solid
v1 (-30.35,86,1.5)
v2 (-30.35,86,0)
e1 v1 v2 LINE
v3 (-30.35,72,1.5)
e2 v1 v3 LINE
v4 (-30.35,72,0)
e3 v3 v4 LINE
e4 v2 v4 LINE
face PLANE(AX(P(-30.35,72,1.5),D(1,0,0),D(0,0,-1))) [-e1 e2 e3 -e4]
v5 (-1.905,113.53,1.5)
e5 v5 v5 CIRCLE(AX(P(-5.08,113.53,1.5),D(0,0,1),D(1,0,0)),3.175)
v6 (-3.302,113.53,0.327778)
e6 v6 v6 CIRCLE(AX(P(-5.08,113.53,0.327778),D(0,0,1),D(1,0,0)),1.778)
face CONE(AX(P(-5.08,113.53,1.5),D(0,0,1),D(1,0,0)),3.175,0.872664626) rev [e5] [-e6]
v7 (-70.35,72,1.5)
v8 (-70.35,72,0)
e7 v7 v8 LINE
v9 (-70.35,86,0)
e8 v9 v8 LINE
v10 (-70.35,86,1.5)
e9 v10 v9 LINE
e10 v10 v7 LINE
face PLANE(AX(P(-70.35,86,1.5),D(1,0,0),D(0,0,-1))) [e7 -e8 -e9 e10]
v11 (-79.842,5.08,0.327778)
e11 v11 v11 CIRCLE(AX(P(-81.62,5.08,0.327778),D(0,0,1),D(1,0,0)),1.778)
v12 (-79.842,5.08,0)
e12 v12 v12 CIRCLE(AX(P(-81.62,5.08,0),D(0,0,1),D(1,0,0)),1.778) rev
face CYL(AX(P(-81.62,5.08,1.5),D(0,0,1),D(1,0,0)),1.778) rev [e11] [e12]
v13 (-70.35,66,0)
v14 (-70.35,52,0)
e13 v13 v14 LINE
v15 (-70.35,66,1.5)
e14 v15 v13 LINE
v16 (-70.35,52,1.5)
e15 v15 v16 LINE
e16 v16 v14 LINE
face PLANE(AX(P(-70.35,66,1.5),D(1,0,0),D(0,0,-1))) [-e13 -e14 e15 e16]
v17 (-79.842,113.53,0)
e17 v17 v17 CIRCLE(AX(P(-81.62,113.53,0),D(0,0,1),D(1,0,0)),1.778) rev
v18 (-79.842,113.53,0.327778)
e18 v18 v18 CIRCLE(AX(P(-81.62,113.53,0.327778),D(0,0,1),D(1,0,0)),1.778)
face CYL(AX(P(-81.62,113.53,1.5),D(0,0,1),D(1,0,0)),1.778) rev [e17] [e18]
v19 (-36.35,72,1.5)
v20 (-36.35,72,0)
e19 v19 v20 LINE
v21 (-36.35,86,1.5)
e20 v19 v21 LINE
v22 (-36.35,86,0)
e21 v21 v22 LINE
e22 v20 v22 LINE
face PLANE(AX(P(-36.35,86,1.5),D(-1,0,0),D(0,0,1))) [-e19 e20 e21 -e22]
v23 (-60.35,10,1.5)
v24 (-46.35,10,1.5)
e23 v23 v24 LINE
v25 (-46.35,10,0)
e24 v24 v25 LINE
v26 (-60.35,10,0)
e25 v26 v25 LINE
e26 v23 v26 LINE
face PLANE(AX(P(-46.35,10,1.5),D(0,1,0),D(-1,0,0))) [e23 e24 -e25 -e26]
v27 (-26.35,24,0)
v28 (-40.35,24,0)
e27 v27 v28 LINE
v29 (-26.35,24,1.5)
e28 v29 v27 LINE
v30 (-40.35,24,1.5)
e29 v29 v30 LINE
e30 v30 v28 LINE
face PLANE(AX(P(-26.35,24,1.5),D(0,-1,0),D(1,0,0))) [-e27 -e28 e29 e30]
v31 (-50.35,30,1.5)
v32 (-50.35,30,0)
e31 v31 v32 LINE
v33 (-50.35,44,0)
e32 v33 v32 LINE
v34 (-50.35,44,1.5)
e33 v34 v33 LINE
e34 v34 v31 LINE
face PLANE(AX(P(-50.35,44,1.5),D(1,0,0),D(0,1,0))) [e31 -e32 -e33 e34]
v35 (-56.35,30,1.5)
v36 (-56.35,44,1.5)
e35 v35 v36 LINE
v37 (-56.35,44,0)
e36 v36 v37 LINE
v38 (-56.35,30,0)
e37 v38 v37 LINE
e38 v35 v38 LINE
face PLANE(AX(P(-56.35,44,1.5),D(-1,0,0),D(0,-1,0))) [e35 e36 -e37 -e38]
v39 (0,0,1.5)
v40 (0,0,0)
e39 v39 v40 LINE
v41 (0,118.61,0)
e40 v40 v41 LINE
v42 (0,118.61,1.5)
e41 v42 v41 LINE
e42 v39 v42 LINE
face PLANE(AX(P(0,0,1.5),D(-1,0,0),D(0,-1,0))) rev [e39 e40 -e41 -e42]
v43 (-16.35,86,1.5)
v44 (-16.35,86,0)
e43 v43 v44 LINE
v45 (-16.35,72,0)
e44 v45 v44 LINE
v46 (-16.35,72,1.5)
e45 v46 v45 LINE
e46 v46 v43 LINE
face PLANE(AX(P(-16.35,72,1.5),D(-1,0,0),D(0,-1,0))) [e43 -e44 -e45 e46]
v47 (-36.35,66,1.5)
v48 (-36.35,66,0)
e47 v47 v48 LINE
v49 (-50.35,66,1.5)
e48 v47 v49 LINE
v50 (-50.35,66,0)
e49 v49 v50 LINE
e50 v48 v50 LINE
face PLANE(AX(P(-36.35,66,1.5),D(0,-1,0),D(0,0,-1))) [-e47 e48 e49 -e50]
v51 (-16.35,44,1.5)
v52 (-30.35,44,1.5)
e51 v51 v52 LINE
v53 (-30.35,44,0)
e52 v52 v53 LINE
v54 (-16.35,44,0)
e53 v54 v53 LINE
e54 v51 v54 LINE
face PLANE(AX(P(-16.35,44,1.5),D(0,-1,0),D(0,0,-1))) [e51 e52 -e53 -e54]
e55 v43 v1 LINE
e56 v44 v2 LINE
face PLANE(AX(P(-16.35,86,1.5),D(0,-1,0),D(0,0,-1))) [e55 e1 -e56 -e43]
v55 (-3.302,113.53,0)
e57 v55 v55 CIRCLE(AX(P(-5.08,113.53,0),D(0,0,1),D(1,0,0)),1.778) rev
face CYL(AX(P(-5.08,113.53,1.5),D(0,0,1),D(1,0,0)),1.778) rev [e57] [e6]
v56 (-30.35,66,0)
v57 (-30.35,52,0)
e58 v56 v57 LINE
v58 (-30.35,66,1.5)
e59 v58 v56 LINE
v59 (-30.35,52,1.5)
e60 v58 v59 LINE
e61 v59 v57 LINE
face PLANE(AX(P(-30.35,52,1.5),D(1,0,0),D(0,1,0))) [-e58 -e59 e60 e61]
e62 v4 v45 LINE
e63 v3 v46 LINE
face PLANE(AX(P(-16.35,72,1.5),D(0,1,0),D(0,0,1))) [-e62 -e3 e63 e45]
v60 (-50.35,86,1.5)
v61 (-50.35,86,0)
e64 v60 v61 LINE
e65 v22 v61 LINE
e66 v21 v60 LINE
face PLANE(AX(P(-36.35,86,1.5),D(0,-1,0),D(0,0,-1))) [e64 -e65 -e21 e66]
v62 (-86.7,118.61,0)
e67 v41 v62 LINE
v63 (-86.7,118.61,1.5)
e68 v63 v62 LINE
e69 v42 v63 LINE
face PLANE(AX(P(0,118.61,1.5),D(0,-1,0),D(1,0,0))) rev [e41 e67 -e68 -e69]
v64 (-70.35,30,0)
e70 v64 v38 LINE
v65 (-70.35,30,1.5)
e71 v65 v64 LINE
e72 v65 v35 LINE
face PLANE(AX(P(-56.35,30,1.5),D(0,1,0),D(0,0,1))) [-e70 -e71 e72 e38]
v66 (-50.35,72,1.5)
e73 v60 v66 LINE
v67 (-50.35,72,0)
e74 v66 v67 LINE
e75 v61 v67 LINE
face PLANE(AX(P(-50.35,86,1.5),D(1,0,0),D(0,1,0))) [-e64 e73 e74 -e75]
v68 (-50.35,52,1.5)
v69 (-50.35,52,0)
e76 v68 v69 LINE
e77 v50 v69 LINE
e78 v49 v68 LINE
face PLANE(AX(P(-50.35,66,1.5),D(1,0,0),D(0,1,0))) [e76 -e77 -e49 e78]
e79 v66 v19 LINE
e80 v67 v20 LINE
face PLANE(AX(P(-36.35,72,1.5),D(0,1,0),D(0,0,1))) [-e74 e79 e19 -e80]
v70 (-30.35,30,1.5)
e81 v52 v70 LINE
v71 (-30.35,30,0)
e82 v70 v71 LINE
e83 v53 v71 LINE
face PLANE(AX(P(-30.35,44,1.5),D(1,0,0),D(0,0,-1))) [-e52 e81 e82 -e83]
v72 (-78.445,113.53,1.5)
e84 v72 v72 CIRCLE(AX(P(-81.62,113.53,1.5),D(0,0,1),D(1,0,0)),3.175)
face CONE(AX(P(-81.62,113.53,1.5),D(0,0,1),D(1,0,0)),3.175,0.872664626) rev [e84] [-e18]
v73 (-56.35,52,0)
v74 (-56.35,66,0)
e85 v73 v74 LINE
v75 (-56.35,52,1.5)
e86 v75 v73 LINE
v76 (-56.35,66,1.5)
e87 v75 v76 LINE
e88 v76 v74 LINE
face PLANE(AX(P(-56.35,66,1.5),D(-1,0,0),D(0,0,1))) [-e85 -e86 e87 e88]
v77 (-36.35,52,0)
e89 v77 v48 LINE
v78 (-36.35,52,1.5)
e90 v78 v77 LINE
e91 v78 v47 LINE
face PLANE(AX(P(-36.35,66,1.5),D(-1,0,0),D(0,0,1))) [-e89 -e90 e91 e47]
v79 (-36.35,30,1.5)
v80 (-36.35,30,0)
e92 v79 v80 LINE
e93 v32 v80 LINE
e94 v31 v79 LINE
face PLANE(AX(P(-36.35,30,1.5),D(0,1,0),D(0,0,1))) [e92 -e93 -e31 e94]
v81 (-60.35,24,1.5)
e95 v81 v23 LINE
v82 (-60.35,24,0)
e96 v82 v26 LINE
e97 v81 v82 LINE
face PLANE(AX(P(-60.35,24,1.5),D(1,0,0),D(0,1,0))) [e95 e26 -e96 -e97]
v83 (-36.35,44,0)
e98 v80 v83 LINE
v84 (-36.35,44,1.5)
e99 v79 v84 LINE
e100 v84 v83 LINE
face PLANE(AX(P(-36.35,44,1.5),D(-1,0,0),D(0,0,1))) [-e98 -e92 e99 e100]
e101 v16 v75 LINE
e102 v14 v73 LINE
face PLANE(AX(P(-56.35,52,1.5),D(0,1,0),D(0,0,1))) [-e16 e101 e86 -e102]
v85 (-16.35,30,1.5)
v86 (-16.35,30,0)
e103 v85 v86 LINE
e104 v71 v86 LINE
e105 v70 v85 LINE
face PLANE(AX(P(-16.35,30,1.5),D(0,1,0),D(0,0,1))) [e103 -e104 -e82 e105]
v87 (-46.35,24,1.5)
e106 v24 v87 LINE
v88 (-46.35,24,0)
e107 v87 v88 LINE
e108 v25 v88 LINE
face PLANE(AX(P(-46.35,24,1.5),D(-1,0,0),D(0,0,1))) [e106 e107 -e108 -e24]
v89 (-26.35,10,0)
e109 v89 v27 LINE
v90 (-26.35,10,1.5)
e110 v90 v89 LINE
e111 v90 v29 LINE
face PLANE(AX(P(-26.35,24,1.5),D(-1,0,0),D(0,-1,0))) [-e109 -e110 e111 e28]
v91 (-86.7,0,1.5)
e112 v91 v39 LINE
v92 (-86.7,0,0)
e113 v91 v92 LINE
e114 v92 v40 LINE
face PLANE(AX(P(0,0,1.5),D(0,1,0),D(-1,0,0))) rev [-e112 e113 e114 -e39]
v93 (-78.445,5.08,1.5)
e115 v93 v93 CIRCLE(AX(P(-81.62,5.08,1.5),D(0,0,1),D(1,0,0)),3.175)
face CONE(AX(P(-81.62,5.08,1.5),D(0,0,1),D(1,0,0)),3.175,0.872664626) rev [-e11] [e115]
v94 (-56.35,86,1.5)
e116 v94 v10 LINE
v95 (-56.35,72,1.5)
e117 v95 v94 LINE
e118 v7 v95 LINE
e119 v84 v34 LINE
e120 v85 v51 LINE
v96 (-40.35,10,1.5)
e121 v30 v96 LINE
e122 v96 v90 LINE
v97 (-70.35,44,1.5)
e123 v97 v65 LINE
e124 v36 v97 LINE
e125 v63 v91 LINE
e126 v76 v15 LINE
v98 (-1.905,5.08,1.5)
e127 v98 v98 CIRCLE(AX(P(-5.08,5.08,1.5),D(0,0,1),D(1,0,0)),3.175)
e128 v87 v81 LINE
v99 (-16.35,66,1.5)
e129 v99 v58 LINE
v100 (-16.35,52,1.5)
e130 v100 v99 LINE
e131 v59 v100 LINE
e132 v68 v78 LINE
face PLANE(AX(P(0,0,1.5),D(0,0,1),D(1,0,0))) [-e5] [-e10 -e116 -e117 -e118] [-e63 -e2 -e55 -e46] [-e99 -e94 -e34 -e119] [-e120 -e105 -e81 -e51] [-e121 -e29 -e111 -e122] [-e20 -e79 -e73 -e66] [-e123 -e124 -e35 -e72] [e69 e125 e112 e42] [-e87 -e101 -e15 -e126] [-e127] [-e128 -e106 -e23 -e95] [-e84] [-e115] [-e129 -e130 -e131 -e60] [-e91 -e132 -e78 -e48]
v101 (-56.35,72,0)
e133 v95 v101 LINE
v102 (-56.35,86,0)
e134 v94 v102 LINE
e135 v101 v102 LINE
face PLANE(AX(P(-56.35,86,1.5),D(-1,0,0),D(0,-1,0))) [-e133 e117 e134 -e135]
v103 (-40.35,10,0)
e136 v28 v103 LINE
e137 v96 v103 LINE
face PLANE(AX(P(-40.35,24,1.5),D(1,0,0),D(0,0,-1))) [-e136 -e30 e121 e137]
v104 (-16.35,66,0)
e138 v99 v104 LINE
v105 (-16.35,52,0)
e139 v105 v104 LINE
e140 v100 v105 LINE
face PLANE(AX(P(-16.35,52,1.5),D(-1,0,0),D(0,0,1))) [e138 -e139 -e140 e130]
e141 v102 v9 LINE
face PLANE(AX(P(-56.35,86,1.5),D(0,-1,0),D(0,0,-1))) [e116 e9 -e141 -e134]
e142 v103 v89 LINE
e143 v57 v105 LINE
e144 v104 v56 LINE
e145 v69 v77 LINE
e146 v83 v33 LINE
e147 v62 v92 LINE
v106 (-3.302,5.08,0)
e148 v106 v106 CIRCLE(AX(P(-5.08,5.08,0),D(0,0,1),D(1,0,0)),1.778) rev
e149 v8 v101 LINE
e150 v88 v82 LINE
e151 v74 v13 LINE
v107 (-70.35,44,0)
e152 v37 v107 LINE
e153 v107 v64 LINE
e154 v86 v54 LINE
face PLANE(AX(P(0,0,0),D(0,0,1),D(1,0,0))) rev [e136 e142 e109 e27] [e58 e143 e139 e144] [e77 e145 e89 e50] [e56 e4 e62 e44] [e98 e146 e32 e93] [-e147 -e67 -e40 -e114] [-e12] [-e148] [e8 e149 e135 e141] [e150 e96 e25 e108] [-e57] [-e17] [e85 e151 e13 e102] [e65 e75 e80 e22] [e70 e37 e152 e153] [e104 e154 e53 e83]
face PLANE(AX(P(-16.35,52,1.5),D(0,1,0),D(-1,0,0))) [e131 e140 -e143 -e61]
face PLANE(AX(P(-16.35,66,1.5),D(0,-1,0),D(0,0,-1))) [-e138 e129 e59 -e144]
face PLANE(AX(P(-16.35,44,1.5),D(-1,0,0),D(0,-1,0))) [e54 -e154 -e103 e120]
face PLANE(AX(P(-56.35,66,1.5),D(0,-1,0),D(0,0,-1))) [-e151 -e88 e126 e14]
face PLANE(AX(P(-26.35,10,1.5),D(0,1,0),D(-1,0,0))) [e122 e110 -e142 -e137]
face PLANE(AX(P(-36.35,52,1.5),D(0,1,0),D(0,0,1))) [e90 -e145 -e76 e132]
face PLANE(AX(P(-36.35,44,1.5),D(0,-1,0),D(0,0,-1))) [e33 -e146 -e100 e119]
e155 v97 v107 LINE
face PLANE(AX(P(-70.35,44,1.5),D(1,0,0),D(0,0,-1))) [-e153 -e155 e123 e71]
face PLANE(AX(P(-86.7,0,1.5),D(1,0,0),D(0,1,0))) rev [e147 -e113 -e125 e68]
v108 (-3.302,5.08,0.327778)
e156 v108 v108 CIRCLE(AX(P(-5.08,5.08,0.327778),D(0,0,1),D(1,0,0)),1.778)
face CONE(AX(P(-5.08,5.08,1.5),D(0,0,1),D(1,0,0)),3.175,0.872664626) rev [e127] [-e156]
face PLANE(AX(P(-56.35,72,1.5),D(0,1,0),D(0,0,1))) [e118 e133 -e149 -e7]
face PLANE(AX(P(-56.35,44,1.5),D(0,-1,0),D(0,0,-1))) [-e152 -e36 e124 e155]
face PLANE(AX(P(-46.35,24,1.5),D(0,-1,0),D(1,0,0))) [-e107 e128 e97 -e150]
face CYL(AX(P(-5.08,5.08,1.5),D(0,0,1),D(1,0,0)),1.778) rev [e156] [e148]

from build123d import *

# Parameters (mm, degrees)
SKETCH1_W           = 86.7
SKETCH1_H           = 118.61
SKETCH1_W_2         = 14
SKETCH1_H_2         = 14
BOSS_EXTRUDE1_DEPTH = 1.5


# Read off the part's stored shape, not the designer's step: CSK for #0 Flat Head Machine Screw (100)1
with BuildPart() as part:
    # Sketch1 → Boss-Extrude1 (new body)
    with BuildSketch(Plane.XY):
        with Locations((-43.35, 59.305)):
            Rectangle(SKETCH1_W, SKETCH1_H)
        with Locations((-23.35, 37)):
            Rectangle(SKETCH1_W_2, SKETCH1_H_2, mode=Mode.SUBTRACT)
        with Locations((-23.35, 79)):
            Rectangle(SKETCH1_W_2, SKETCH1_H_2, mode=Mode.SUBTRACT)
        with Locations((-43.35, 79)):
            Rectangle(SKETCH1_W_2, SKETCH1_H_2, mode=Mode.SUBTRACT)
        with Locations((-63.35, 79)):
            Rectangle(SKETCH1_W_2, SKETCH1_H_2, mode=Mode.SUBTRACT)
        with Locations((-23.35, 59)):
            Rectangle(SKETCH1_W_2, SKETCH1_H_2, mode=Mode.SUBTRACT)
        with Locations((-43.35, 59)):
            Rectangle(SKETCH1_W_2, SKETCH1_H_2, mode=Mode.SUBTRACT)
        with Locations((-63.35, 59)):
            Rectangle(SKETCH1_W_2, SKETCH1_H_2, mode=Mode.SUBTRACT)
        with Locations((-43.35, 37)):
            Rectangle(SKETCH1_W_2, SKETCH1_H_2, mode=Mode.SUBTRACT)
        with Locations((-63.35, 37)):
            Rectangle(SKETCH1_W_2, SKETCH1_H_2, mode=Mode.SUBTRACT)
        with Locations((-33.35, 17)):
            Rectangle(SKETCH1_W_2, SKETCH1_H_2, mode=Mode.SUBTRACT)
        with Locations((-53.35, 17)):
            Rectangle(SKETCH1_W_2, SKETCH1_H_2, mode=Mode.SUBTRACT)
    extrude(amount=BOSS_EXTRUDE1_DEPTH)

    # CSK for _0 Flat Head Machine Screw _ 2 → CSK for #0 Flat Head Machine Screw (100)1 (revolve, cut)
    with BuildSketch(Plane(origin=(-5.08, 5.08, 0), x_dir=(1, 0, 0), z_dir=(0, -1, 0))):
        Polygon((0, 0), (1.778, 0), (1.778, 0.327777815), (3.175, 1.5), (0, 1.5), align=None)
    revolve(axis=Axis((-5.08, 5.08, 0), (0, 0, 1)), mode=Mode.SUBTRACT)

    # CSK for _0 Flat Head Machine Screw _ 3 o → CSK for _0 Flat Head Machine Screw _ 3 (revolve, cut)
    with BuildSketch(Plane(origin=(-81.62, 5.08, 0), x_dir=(1, 0, 0), z_dir=(0, -1, 0))):
        Polygon((0, 0), (1.778, 0), (1.778, 0.327777815), (3.175, 1.5), (0, 1.5), align=None)
    revolve(axis=Axis((-81.62, 5.08, 0), (0, 0, 1)), mode=Mode.SUBTRACT)

    # CSK for _0 Flat Head Machine Screw _ 4 o → CSK for _0 Flat Head Machine Screw _ 4 (revolve, cut)
    with BuildSketch(Plane(origin=(-81.62, 113.53, 0), x_dir=(1, 0, 0), z_dir=(0, -1, 0))):
        Polygon((0, 0), (1.778, 0), (1.778, 0.327777815), (3.175, 1.5), (0, 1.5), align=None)
    revolve(axis=Axis((-81.62, 113.53, 0), (0, 0, 1)), mode=Mode.SUBTRACT)

    # CSK for _0 Flat Head Machine Screw _ 5 o → CSK for _0 Flat Head Machine Screw _ 5 (revolve, cut)
    with BuildSketch(Plane(origin=(-5.08, 113.53, 0), x_dir=(1, 0, 0), z_dir=(0, -1, 0))):
        Polygon((0, 0), (1.778, 0), (1.778, 0.327777815), (3.175, 1.5), (0, 1.5), align=None)
    revolve(axis=Axis((-5.08, 113.53, 0), (0, 0, 1)), mode=Mode.SUBTRACT)


solid = part.part
